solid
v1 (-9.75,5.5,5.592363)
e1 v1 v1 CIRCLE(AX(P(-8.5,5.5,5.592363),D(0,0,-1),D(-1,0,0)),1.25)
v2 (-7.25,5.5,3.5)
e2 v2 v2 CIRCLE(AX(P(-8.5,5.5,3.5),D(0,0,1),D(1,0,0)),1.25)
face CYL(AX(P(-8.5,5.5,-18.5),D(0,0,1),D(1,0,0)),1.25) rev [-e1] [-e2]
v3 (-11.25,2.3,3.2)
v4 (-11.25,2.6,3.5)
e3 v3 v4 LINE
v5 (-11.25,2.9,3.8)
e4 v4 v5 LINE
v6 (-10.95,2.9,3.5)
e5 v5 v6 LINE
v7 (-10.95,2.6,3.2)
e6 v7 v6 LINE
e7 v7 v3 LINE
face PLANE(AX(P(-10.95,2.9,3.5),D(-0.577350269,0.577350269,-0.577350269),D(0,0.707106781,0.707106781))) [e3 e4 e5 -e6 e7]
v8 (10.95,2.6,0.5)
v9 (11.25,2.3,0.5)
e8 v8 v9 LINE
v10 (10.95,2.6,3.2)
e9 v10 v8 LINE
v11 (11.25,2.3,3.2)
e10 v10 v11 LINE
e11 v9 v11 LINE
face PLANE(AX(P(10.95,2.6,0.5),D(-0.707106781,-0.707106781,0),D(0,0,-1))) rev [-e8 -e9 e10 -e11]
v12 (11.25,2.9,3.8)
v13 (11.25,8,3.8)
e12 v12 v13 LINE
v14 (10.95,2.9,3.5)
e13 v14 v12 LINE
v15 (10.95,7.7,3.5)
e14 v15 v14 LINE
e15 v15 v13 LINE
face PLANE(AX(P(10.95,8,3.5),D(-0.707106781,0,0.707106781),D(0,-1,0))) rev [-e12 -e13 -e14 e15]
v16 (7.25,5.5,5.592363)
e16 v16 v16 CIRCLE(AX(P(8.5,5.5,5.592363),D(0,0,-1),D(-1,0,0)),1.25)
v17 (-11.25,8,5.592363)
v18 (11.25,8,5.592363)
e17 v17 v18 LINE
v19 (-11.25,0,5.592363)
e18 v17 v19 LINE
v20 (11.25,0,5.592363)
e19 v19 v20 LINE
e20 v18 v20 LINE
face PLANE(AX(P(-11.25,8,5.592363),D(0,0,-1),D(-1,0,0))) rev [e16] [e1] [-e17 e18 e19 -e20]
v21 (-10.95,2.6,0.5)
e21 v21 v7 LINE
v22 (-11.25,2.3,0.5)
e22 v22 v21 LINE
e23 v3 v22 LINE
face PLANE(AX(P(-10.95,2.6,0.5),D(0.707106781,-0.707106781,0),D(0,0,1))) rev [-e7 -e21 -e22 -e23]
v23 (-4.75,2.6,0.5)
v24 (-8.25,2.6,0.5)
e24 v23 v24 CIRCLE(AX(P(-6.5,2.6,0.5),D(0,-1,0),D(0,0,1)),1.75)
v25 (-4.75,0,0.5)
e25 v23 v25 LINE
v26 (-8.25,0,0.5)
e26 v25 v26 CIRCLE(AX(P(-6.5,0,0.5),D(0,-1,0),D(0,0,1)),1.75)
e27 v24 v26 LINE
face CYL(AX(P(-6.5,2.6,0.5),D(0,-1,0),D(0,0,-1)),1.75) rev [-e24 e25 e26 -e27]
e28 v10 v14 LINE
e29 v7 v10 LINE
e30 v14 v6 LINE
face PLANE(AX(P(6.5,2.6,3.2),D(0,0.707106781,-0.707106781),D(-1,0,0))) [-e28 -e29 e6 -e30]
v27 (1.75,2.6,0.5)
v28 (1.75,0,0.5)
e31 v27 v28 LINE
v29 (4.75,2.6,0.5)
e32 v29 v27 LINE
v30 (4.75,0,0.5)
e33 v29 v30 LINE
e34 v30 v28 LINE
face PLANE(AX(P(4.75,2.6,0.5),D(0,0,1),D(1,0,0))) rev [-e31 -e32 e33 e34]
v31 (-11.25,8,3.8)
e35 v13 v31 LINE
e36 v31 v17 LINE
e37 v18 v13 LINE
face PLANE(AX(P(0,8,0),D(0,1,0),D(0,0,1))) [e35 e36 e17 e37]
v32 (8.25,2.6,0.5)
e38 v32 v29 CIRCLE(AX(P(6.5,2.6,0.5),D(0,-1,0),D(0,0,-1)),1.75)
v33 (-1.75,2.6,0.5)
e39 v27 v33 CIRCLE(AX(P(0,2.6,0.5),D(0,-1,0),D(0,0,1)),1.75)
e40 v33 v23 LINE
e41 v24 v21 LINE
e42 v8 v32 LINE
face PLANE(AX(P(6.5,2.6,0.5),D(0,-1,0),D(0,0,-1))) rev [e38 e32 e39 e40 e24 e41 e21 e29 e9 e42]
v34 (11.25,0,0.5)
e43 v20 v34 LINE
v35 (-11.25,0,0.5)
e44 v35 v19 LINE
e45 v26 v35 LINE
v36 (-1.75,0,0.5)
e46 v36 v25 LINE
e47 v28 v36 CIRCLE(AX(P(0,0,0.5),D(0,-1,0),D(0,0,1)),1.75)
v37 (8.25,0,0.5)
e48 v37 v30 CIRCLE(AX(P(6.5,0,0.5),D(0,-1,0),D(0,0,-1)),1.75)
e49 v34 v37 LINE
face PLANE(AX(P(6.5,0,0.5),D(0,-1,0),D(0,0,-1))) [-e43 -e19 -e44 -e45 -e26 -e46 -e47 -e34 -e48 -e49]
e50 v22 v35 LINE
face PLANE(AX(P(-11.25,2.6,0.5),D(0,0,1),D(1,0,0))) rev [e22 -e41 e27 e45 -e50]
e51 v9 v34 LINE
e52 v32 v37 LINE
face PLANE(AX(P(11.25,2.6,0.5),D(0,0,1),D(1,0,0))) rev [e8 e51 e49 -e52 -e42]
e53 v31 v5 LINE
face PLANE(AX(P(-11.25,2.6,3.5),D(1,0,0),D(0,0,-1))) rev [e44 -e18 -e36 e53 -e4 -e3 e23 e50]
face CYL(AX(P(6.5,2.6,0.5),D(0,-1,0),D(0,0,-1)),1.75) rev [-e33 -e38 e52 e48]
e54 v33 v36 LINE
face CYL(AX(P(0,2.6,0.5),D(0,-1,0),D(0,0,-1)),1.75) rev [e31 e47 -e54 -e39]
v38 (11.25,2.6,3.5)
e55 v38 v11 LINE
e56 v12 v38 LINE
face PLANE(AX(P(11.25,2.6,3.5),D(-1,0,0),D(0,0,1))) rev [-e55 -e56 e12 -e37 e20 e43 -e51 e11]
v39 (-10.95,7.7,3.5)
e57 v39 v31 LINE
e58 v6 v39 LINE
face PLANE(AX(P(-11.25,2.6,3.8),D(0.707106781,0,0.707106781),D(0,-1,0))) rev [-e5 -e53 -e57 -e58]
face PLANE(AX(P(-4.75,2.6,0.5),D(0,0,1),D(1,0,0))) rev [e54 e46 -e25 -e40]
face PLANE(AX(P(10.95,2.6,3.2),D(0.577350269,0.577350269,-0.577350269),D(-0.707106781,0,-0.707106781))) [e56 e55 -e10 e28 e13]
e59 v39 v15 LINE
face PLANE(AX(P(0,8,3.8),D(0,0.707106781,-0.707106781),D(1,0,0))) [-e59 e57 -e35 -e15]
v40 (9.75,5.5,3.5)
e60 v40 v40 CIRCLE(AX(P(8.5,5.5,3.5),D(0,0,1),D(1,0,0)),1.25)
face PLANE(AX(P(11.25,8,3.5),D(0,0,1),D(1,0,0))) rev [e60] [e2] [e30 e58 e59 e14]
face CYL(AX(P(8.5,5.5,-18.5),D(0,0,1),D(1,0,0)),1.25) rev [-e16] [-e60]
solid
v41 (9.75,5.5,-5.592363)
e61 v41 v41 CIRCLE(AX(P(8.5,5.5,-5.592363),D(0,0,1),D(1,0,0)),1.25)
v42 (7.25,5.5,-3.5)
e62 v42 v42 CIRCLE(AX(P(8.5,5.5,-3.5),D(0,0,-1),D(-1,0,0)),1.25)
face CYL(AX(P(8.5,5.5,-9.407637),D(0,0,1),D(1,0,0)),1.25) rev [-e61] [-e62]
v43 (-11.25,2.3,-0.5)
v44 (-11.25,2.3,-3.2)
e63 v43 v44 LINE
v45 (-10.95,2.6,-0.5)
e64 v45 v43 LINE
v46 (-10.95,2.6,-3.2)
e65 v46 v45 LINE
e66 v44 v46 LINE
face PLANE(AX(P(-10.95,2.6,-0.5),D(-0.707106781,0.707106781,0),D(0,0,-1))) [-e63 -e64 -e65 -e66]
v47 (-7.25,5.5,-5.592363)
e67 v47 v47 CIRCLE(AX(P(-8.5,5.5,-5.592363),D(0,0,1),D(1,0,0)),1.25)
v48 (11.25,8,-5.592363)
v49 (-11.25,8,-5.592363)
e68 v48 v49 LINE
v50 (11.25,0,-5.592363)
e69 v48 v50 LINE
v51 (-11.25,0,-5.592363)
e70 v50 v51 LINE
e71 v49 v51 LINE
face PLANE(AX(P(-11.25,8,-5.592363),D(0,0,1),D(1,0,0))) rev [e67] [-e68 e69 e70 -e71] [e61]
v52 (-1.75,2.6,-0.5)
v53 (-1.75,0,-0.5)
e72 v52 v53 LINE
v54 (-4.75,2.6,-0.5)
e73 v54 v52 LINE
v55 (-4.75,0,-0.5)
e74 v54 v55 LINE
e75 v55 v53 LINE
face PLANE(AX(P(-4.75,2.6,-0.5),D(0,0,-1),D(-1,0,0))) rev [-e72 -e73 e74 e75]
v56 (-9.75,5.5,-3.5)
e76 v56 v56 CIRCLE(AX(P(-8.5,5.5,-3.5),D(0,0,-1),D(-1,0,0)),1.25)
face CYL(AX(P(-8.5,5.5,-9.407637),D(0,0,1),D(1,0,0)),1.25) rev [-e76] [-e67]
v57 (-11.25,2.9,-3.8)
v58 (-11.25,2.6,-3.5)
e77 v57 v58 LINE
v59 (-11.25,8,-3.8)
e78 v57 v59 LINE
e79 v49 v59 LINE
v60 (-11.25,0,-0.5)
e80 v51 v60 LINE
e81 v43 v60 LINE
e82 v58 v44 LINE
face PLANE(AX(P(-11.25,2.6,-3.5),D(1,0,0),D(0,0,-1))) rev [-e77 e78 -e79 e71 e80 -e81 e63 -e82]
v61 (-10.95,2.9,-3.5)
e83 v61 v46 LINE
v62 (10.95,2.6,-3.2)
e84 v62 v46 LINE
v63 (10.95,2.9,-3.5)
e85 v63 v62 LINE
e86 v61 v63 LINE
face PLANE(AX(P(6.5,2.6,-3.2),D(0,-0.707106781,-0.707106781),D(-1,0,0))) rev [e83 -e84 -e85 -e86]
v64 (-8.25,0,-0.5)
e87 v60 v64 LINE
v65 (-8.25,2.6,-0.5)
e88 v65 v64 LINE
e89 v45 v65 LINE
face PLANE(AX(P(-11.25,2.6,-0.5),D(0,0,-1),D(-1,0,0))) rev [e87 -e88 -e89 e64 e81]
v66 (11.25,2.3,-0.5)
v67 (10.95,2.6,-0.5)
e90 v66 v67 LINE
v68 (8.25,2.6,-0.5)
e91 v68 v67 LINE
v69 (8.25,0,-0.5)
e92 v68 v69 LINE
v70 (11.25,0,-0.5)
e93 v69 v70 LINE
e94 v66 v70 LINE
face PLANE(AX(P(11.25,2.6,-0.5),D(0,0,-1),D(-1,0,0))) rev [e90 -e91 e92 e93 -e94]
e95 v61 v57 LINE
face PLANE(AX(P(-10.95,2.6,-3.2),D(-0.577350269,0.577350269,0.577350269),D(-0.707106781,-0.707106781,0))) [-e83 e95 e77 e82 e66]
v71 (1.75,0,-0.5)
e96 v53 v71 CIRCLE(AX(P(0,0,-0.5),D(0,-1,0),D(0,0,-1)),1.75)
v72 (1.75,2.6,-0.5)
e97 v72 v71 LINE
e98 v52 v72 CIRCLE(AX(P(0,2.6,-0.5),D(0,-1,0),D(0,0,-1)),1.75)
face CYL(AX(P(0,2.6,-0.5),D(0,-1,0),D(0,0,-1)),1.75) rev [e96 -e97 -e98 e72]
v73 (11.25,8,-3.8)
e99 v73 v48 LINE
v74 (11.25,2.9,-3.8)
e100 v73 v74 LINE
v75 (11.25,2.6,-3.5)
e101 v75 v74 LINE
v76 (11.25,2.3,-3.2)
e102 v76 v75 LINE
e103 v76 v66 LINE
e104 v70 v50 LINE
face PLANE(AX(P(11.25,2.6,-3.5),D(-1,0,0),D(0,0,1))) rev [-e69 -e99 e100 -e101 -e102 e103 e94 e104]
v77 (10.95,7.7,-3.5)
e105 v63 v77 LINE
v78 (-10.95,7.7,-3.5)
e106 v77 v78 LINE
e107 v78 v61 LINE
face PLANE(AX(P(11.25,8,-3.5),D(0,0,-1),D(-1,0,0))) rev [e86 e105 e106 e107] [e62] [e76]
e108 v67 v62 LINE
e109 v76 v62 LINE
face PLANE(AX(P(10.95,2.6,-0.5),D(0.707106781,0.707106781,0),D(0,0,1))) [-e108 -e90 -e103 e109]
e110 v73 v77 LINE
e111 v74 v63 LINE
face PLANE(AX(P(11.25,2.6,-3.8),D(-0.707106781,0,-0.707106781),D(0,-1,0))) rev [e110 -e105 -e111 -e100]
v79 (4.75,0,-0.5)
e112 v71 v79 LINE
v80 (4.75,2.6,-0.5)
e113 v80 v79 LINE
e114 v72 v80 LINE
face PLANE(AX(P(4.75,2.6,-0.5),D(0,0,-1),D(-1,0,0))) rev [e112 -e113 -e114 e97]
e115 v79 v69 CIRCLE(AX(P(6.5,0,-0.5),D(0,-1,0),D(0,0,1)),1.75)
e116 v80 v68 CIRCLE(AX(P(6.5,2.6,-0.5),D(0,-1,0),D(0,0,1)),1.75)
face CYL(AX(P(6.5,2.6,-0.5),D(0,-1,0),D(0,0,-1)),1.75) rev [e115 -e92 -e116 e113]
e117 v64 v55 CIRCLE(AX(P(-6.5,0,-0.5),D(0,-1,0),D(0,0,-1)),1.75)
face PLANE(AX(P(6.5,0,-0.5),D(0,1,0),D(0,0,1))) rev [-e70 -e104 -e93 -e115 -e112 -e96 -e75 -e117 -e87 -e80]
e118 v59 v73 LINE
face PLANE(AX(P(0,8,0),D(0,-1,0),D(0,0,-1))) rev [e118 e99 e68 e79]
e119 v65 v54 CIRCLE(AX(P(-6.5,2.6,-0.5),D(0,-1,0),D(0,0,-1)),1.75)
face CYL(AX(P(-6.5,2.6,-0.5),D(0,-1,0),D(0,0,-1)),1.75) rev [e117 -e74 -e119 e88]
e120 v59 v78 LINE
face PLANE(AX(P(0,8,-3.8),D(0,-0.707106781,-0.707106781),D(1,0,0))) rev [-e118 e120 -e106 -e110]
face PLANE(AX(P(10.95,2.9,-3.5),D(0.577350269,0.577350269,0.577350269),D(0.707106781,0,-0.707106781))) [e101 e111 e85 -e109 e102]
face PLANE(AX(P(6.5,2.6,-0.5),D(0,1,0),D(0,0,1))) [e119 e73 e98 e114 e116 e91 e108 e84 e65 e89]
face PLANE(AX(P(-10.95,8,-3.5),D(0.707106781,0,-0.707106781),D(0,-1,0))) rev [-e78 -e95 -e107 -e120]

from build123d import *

# Parameters (mm, degrees)
SALIENTE_EXTRUIR1_DEPTH   = 2.6
SALIENTE_EXTRUIR1_2_DEPTH = 2.6
CROQUIS2_W                = 22.5
CROQUIS2_H                = 2.092363452
SALIENTE_EXTRUIR2_DEPTH   = 8
CHAFL_N1_SIZE             = 0.3
CHAFL_N2_SIZE             = 0.3
CORTAR_EXTRUIR2_START     = 7
CORTAR_EXTRUIR2_OUTLINE_R = 1.25
CORTAR_EXTRUIR2_DEPTH     = 2.092363452
CORTAR_EXTRUIR3_START     = -15
CROQUIS5_R                = 1.25
CORTAR_EXTRUIR3_DEPTH     = 15


# Read off the part's stored shape, not the designer's step: Cortar-Extruir2
with BuildPart() as part:
    # Croquis1 → Saliente-Extruir1 (new body)
    with BuildSketch(Plane(origin=(0, 0, 0), x_dir=(1, 0, 0), z_dir=(0, 1, 0))):
        with BuildLine():
            Line((-11.25, 3.5), (-11.25, 0.5))
            Line((-11.25, 0.5), (-8.25, 0.5))
            ThreePointArc((-8.25, 0.5), (-6.5, 2.25), (-4.75, 0.5))
            Line((-4.75, 0.5), (-1.75, 0.5))
            ThreePointArc((-1.75, 0.5), (0, 2.25), (1.75, 0.5))
            Line((1.75, 0.5), (4.75, 0.5))
            ThreePointArc((4.75, 0.5), (6.5, 2.25), (8.25, 0.5))
            Line((8.25, 0.5), (11.25, 0.5))
            Line((11.25, 0.5), (11.25, 3.5))
            Line((11.25, 3.5), (-11.25, 3.5))
        make_face()
    extrude(amount=SALIENTE_EXTRUIR1_DEPTH)



with BuildPart() as body_2:
    # Croquis1 → Saliente-Extruir1 2 (new body)
    with BuildSketch(Plane(origin=(0, 0, 0), x_dir=(1, 0, 0), z_dir=(0, 1, 0))):
        with BuildLine():
            Line((-11.25, -3.5), (-11.25, -0.5))
            Line((-11.25, -0.5), (-8.25, -0.5))
            ThreePointArc((-8.25, -0.5), (-6.5, -2.25), (-4.75, -0.5))
            Line((-4.75, -0.5), (-1.75, -0.5))
            ThreePointArc((-1.75, -0.5), (0, -2.25), (1.75, -0.5))
            Line((1.75, -0.5), (4.75, -0.5))
            ThreePointArc((4.75, -0.5), (6.5, -2.25), (8.25, -0.5))
            Line((8.25, -0.5), (11.25, -0.5))
            Line((11.25, -0.5), (11.25, -3.5))
            Line((11.25, -3.5), (-11.25, -3.5))
        make_face()
    extrude(amount=SALIENTE_EXTRUIR1_2_DEPTH)


with BuildPart() as part_1:
    add(part.part)

    add(body_2.part)  # Saliente-Extruir2 merges body 2
    # Croquis2 → Saliente-Extruir2 (add)
    with BuildSketch(Plane(origin=(0, 0, 0), x_dir=(1, 0, 0), z_dir=(0, 1, 0))):
        with Locations((0, 4.546181726)):
            Rectangle(CROQUIS2_W, CROQUIS2_H)
        with Locations((0, -4.546181726)):
            Rectangle(CROQUIS2_W, CROQUIS2_H)
    extrude(amount=SALIENTE_EXTRUIR2_DEPTH)

    # Chaflán1
    chafl_n1_edges = [part_1.edges().sort_by_distance(p)[0] for p in [
        (11.25, 2.6, -2),
        (0, 2.6, -3.5),
        (-11.25, 5.3, -3.5),
        (11.25, 5.3, -3.5),
        (0, 8, -3.5),
        (-11.25, 2.6, -2),
    ]]
    chamfer(chafl_n1_edges, length=CHAFL_N1_SIZE)

    # Chaflán2
    chafl_n2_edges = [part_1.edges().sort_by_distance(p)[0] for p in [
        (-11.25, 2.6, 2),
        (11.25, 5.3, 3.5),
        (-11.25, 5.3, 3.5),
        (0, 8, 3.5),
        (0, 2.6, 3.5),
        (11.25, 2.6, 2),
    ]]
    chamfer(chafl_n2_edges, length=CHAFL_N2_SIZE)

    # Cortar-Extruir2 outline → Cortar-Extruir2 (cut)
    with BuildSketch(Plane.XY.offset(-3.5).offset(CORTAR_EXTRUIR2_START)):
        with Locations((8.5, 5.5)):
            Circle(CORTAR_EXTRUIR2_OUTLINE_R)
        with Locations((-8.5, 5.5)):
            Circle(CORTAR_EXTRUIR2_OUTLINE_R)
    extrude(amount=CORTAR_EXTRUIR2_DEPTH, mode=Mode.SUBTRACT)

    # Croquis5 → Cortar-Extruir3 (cut)
    with BuildSketch(Plane.XY.offset(5.592363452).offset(CORTAR_EXTRUIR3_START)):
        with Locations((-8.5, 5.5)):
            Circle(CROQUIS5_R)
        with Locations((8.5, 5.5)):
            Circle(CROQUIS5_R)
    extrude(amount=CORTAR_EXTRUIR3_DEPTH, mode=Mode.SUBTRACT)


solid = part_1.part
